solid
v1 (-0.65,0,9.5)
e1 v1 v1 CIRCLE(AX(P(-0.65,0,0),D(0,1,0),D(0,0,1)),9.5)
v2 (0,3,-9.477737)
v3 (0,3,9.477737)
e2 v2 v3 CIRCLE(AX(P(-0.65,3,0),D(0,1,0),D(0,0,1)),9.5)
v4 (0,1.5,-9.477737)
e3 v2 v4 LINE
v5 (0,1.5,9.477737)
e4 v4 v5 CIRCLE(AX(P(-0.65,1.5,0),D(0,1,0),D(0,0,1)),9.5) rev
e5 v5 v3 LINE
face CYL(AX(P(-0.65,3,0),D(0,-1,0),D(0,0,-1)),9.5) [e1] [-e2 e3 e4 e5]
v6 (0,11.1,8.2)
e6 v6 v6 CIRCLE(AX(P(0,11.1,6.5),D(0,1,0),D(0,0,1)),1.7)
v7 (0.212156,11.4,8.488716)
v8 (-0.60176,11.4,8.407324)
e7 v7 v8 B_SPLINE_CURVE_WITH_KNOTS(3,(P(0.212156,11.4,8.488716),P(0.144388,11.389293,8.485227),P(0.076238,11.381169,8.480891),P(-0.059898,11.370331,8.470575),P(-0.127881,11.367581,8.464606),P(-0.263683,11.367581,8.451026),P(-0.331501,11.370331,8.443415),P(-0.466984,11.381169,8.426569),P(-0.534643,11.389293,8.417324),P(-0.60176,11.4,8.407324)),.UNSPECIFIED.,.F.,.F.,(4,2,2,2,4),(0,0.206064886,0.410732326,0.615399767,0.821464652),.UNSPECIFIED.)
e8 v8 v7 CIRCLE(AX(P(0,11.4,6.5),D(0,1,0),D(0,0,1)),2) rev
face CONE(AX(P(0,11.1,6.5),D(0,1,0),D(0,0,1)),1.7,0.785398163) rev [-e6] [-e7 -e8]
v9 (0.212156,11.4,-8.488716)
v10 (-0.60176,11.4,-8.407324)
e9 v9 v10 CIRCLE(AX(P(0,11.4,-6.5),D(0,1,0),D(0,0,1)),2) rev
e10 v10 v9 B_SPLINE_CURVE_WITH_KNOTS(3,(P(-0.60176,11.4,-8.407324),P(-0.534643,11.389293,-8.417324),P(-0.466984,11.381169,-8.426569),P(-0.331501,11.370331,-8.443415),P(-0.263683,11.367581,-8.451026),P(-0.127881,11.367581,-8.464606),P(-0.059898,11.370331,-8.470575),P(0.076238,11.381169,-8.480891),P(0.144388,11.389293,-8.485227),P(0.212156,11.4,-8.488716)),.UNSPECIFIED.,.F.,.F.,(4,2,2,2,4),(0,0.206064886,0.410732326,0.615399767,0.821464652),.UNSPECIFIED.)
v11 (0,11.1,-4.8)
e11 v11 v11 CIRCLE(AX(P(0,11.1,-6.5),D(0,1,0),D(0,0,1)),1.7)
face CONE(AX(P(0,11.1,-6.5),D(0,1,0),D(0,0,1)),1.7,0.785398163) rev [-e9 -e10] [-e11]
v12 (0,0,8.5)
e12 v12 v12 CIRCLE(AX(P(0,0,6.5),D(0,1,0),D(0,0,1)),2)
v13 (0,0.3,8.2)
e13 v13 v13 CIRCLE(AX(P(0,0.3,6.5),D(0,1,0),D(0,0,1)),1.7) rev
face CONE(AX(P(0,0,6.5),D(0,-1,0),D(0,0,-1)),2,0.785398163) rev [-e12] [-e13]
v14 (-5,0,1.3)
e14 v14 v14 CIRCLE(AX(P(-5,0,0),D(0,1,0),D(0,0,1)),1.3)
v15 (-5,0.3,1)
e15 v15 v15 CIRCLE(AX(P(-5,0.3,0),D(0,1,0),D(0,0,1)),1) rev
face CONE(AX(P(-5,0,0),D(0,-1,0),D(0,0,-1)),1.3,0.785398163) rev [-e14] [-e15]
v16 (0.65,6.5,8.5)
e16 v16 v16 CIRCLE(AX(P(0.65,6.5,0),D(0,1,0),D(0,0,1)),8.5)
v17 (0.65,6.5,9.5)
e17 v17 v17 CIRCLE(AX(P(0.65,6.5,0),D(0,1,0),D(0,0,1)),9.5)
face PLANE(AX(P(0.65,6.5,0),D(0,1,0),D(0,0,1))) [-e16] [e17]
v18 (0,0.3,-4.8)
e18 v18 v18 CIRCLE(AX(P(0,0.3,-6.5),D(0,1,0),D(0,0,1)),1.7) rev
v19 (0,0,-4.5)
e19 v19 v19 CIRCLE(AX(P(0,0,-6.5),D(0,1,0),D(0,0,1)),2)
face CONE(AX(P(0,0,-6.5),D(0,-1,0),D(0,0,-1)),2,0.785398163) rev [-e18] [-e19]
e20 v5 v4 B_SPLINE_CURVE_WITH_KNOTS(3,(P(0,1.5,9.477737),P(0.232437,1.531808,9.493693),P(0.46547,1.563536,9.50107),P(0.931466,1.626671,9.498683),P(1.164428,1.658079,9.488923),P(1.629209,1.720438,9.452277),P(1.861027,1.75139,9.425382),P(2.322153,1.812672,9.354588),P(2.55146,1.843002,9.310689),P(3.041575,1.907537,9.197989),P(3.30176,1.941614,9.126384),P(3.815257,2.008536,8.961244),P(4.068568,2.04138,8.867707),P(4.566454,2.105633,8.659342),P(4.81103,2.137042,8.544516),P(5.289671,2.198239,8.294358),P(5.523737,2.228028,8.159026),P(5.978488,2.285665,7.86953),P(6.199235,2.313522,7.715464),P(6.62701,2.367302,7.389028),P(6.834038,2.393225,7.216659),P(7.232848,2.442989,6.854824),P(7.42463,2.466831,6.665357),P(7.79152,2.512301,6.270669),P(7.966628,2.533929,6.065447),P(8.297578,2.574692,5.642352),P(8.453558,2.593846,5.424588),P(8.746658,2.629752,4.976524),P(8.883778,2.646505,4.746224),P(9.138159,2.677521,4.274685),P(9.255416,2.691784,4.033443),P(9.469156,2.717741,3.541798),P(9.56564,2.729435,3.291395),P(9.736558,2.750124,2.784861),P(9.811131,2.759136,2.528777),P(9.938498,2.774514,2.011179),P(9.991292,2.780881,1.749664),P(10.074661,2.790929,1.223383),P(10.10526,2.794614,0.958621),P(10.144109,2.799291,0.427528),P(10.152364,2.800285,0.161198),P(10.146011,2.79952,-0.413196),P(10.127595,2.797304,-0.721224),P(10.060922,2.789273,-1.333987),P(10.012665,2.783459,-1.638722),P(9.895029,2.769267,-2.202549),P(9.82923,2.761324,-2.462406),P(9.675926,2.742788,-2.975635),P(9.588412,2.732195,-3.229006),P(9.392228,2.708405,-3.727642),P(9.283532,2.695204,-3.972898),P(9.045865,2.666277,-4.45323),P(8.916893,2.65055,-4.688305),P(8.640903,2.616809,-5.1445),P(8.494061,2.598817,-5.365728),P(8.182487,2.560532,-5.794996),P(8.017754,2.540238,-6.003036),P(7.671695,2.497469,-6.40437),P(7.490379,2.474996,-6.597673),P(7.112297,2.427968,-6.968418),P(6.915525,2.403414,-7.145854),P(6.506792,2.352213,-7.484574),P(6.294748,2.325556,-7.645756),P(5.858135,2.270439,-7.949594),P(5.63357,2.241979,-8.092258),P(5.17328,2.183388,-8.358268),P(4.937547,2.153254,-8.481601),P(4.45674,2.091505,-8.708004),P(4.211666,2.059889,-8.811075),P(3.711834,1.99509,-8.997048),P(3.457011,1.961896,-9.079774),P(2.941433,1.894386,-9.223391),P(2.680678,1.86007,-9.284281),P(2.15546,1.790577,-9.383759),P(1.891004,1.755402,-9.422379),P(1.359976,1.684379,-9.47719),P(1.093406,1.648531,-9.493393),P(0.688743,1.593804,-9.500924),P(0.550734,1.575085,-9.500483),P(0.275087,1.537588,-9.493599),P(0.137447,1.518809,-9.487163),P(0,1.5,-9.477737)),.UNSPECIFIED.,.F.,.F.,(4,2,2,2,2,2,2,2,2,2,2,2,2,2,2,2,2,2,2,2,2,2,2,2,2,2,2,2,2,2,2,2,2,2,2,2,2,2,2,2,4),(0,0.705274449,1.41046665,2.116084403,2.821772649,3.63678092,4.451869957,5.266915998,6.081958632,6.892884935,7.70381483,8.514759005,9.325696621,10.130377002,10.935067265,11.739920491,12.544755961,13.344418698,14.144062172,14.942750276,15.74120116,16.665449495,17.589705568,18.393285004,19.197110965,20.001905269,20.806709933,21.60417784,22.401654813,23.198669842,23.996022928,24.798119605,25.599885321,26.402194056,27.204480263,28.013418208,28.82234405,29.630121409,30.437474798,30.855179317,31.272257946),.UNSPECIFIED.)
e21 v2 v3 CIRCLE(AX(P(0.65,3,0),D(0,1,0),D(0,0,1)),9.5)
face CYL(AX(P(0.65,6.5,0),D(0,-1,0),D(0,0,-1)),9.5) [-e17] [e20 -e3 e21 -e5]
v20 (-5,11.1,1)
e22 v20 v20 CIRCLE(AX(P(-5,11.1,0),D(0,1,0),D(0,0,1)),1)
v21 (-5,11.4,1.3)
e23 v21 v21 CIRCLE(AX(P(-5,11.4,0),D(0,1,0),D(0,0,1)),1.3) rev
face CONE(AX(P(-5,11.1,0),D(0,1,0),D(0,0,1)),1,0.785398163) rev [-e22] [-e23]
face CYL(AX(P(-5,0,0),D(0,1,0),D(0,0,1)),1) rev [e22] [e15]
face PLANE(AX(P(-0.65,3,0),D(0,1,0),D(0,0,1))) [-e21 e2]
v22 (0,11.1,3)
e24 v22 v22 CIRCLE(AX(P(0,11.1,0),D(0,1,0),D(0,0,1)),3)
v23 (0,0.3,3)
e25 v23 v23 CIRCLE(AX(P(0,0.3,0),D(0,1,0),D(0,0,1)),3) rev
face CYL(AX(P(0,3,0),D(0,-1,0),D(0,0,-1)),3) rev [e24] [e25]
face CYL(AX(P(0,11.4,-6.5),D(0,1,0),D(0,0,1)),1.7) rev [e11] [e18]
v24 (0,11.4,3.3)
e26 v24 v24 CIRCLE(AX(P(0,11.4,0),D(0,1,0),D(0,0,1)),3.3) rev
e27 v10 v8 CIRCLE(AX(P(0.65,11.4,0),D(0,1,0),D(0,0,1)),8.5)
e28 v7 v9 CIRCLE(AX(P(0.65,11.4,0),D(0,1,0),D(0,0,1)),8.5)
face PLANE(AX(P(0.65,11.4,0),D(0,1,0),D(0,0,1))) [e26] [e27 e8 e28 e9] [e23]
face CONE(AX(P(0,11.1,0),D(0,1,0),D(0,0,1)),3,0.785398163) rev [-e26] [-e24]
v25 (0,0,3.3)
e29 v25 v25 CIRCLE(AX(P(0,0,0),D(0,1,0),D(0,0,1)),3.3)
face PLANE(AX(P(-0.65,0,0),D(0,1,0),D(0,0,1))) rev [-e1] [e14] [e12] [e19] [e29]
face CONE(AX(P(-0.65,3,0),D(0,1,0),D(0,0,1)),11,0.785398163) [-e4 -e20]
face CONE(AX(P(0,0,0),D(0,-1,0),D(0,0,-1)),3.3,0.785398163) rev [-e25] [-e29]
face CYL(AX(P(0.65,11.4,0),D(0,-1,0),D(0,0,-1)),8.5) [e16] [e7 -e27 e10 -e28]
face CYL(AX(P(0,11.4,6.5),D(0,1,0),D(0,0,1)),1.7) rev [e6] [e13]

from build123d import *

# Parameters (mm, degrees)
SKETCH1_R            = 9.5
SKETCH1_R_2          = 3
BOSS_EXTRUDE1_DEPTH  = 3
SKETCH7_R            = 8.5
SKETCH7_R_2          = 3
BOSS_EXTRUDE5_DEPTH  = 8.4
SKETCH8_R            = 9.5
SKETCH8_R_2          = 8.5
BOSS_EXTRUDE6_DEPTH  = 3.5
CHAMFER1_SIZE        = 1.5
SKETCH12_R           = 3
SKETCH12_R_2         = 1
CUT_EXTRUDE4_DEPTH   = 18.978668035
M3_CLEARANCE_HOLE1_D = 3.4
CHAMFER2_SIZE        = 0.3


with BuildPart() as part:
    # Sketch1 → Boss-Extrude1 (new body)
    with BuildSketch(Plane(origin=(0, 0, 0), x_dir=(1, 0, 0), z_dir=(0, 1, 0))):
        with Locations(Location((-0.65, 0, 0), (0, 0, 270))):
            Circle(SKETCH1_R)
        with Locations(Location((0, 0, 0), (0, 0, 270))):
            Circle(SKETCH1_R_2, mode=Mode.SUBTRACT)
    extrude(amount=BOSS_EXTRUDE1_DEPTH)

    # Sketch7 → Boss-Extrude5 (add)
    with BuildSketch(Plane(origin=(0, 3, 0), x_dir=(1, 0, 0), z_dir=(0, 1, 0))):
        with Locations(Location((0.65, 0, 0), (0, 0, 42.437907805))):
            Circle(SKETCH7_R)
        with Locations(Location((0, 0, 0), (0, 0, 270))):
            Circle(SKETCH7_R_2, mode=Mode.SUBTRACT)
    extrude(amount=BOSS_EXTRUDE5_DEPTH)

    # Sketch8 → Boss-Extrude6 (add)
    with BuildSketch(Plane(origin=(0, 3, 0), x_dir=(1, 0, 0), z_dir=(0, 1, 0))):
        with Locations(Location((0.65, 0, 0), (0, 0, 93.923302734))):
            Circle(SKETCH8_R)
        with Locations(Location((0.65, 0, 0), (0, 0, 270))):
            Circle(SKETCH8_R_2, mode=Mode.SUBTRACT)
    extrude(amount=BOSS_EXTRUDE6_DEPTH)

    # Chamfer1
    # the kernel refuses this chamfer: 1.5 mm, written as the material it adds along each edge
    with BuildSketch(Plane(origin=(-0.65, 3, 0), x_dir=(-0.3317687677714116, 0, -0.9433607394477679), z_dir=(-0.9433607394477679, 0, 0.3317687677714116))) as chamfer1_piece_1_section:
        Polygon((9.5, CHAMFER1_SIZE), (9.5 + CHAMFER1_SIZE, 0), (9.5, 0), align=None)
    chamfer1_piece_1 = revolve(axis=Axis((-0.65, 3, 0), (0, -1, 0)), revolution_arc=218.752335407, mode=Mode.PRIVATE)
    chamfer1_piece_1 = chamfer1_piece_1 & Plane(origin=(0.65, 2.170447869, 0), x_dir=(-0.06842105263614455, 0, -0.9976565338613094), z_dir=(0, -1, 0)) * Cylinder(9.5, 44, mode=Mode.PRIVATE)
    add(chamfer1_piece_1)

    # Sketch12 → Cut-Extrude4 (cut, through all)
    with BuildSketch(Plane(origin=(0, 11.4, 0), x_dir=(1, 0, 0), z_dir=(0, 1, 0))):
        with Locations(Location((0, 0, 0), (0, 0, 270))):
            Circle(SKETCH12_R)
        with Locations(Location((-5, 0, 0), (0, 0, 270))):
            Circle(SKETCH12_R_2)
    extrude(amount=-CUT_EXTRUDE4_DEPTH, mode=Mode.SUBTRACT)

    # M3 Clearance Hole1 (through all)
    with Locations(Plane(origin=(0, 11.4, 0), x_dir=(1, 0, 0), z_dir=(0, 1, 0))):
        with Locations((0, 6.5), (0, -6.5)):
            Hole(M3_CLEARANCE_HOLE1_D / 2)

    # Chamfer2
    # the kernel refuses this chamfer: 0.3 mm, written as the material it takes off along each edge
    with BuildSketch(Plane(origin=(0, 11.4, 0), x_dir=(0, 0, 1), z_dir=(-1, 0, 0))) as chamfer2_piece_1:
        Polygon((3, -CHAMFER2_SIZE), (3 + CHAMFER2_SIZE, 0), (3, 0), align=None)
    revolve(axis=Axis((0, 11.4, 0), (0, 1, 0)), mode=Mode.SUBTRACT)
    with BuildSketch(Plane(origin=(-5, 0, 0), x_dir=(0, 0, 1), z_dir=(-1, 0, 0))) as chamfer2_piece_2:
        Polygon((1 + CHAMFER2_SIZE, 0), (1, CHAMFER2_SIZE), (1, 0), align=None)
    revolve(axis=Axis((-5, 0, 0), (0, 1, 0)), mode=Mode.SUBTRACT)
    with BuildSketch(Plane(origin=(-5, 11.4, 0), x_dir=(0, 0, 1), z_dir=(-1, 0, 0))) as chamfer2_piece_3:
        Polygon((1, -CHAMFER2_SIZE), (1 + CHAMFER2_SIZE, 0), (1, 0), align=None)
    revolve(axis=Axis((-5, 11.4, 0), (0, 1, 0)), mode=Mode.SUBTRACT)
    with BuildSketch(Plane(origin=(0, 0, 0), x_dir=(0, 0, 1), z_dir=(-1, 0, 0))) as chamfer2_piece_4:
        Polygon((3 + CHAMFER2_SIZE, 0), (3, CHAMFER2_SIZE), (3, 0), align=None)
    revolve(axis=Axis((0, 0, 0), (0, 1, 0)), mode=Mode.SUBTRACT)
    with BuildSketch(Plane(origin=(0, 11.4, 6.5), x_dir=(-1, 0, 0), z_dir=(0, 0, 1))) as chamfer2_piece_5:
        Polygon((1.7, CHAMFER2_SIZE), (1.7 + CHAMFER2_SIZE, 0), (1.7, 0), align=None)
    revolve(axis=Axis((0, 11.4, 6.5), (0, -1, 0)), mode=Mode.SUBTRACT)
    with BuildSketch(Plane(origin=(0, 0, 6.5), x_dir=(-1, 0, 0), z_dir=(0, 0, 1))) as chamfer2_piece_6:
        Polygon((1.7 + CHAMFER2_SIZE, 0), (1.7, -CHAMFER2_SIZE), (1.7, 0), align=None)
    revolve(axis=Axis((0, 0, 6.5), (0, -1, 0)), mode=Mode.SUBTRACT)
    with BuildSketch(Plane(origin=(0, 11.4, -6.5), x_dir=(-1, 0, 0), z_dir=(0, 0, 1))) as chamfer2_piece_7:
        Polygon((1.7, CHAMFER2_SIZE), (1.7 + CHAMFER2_SIZE, 0), (1.7, 0), align=None)
    revolve(axis=Axis((0, 11.4, -6.5), (0, -1, 0)), mode=Mode.SUBTRACT)
    with BuildSketch(Plane(origin=(0, 0, -6.5), x_dir=(-1, 0, 0), z_dir=(0, 0, 1))) as chamfer2_piece_8:
        Polygon((1.7 + CHAMFER2_SIZE, 0), (1.7, -CHAMFER2_SIZE), (1.7, 0), align=None)
    revolve(axis=Axis((0, 0, -6.5), (0, -1, 0)), mode=Mode.SUBTRACT)


solid = part.part
